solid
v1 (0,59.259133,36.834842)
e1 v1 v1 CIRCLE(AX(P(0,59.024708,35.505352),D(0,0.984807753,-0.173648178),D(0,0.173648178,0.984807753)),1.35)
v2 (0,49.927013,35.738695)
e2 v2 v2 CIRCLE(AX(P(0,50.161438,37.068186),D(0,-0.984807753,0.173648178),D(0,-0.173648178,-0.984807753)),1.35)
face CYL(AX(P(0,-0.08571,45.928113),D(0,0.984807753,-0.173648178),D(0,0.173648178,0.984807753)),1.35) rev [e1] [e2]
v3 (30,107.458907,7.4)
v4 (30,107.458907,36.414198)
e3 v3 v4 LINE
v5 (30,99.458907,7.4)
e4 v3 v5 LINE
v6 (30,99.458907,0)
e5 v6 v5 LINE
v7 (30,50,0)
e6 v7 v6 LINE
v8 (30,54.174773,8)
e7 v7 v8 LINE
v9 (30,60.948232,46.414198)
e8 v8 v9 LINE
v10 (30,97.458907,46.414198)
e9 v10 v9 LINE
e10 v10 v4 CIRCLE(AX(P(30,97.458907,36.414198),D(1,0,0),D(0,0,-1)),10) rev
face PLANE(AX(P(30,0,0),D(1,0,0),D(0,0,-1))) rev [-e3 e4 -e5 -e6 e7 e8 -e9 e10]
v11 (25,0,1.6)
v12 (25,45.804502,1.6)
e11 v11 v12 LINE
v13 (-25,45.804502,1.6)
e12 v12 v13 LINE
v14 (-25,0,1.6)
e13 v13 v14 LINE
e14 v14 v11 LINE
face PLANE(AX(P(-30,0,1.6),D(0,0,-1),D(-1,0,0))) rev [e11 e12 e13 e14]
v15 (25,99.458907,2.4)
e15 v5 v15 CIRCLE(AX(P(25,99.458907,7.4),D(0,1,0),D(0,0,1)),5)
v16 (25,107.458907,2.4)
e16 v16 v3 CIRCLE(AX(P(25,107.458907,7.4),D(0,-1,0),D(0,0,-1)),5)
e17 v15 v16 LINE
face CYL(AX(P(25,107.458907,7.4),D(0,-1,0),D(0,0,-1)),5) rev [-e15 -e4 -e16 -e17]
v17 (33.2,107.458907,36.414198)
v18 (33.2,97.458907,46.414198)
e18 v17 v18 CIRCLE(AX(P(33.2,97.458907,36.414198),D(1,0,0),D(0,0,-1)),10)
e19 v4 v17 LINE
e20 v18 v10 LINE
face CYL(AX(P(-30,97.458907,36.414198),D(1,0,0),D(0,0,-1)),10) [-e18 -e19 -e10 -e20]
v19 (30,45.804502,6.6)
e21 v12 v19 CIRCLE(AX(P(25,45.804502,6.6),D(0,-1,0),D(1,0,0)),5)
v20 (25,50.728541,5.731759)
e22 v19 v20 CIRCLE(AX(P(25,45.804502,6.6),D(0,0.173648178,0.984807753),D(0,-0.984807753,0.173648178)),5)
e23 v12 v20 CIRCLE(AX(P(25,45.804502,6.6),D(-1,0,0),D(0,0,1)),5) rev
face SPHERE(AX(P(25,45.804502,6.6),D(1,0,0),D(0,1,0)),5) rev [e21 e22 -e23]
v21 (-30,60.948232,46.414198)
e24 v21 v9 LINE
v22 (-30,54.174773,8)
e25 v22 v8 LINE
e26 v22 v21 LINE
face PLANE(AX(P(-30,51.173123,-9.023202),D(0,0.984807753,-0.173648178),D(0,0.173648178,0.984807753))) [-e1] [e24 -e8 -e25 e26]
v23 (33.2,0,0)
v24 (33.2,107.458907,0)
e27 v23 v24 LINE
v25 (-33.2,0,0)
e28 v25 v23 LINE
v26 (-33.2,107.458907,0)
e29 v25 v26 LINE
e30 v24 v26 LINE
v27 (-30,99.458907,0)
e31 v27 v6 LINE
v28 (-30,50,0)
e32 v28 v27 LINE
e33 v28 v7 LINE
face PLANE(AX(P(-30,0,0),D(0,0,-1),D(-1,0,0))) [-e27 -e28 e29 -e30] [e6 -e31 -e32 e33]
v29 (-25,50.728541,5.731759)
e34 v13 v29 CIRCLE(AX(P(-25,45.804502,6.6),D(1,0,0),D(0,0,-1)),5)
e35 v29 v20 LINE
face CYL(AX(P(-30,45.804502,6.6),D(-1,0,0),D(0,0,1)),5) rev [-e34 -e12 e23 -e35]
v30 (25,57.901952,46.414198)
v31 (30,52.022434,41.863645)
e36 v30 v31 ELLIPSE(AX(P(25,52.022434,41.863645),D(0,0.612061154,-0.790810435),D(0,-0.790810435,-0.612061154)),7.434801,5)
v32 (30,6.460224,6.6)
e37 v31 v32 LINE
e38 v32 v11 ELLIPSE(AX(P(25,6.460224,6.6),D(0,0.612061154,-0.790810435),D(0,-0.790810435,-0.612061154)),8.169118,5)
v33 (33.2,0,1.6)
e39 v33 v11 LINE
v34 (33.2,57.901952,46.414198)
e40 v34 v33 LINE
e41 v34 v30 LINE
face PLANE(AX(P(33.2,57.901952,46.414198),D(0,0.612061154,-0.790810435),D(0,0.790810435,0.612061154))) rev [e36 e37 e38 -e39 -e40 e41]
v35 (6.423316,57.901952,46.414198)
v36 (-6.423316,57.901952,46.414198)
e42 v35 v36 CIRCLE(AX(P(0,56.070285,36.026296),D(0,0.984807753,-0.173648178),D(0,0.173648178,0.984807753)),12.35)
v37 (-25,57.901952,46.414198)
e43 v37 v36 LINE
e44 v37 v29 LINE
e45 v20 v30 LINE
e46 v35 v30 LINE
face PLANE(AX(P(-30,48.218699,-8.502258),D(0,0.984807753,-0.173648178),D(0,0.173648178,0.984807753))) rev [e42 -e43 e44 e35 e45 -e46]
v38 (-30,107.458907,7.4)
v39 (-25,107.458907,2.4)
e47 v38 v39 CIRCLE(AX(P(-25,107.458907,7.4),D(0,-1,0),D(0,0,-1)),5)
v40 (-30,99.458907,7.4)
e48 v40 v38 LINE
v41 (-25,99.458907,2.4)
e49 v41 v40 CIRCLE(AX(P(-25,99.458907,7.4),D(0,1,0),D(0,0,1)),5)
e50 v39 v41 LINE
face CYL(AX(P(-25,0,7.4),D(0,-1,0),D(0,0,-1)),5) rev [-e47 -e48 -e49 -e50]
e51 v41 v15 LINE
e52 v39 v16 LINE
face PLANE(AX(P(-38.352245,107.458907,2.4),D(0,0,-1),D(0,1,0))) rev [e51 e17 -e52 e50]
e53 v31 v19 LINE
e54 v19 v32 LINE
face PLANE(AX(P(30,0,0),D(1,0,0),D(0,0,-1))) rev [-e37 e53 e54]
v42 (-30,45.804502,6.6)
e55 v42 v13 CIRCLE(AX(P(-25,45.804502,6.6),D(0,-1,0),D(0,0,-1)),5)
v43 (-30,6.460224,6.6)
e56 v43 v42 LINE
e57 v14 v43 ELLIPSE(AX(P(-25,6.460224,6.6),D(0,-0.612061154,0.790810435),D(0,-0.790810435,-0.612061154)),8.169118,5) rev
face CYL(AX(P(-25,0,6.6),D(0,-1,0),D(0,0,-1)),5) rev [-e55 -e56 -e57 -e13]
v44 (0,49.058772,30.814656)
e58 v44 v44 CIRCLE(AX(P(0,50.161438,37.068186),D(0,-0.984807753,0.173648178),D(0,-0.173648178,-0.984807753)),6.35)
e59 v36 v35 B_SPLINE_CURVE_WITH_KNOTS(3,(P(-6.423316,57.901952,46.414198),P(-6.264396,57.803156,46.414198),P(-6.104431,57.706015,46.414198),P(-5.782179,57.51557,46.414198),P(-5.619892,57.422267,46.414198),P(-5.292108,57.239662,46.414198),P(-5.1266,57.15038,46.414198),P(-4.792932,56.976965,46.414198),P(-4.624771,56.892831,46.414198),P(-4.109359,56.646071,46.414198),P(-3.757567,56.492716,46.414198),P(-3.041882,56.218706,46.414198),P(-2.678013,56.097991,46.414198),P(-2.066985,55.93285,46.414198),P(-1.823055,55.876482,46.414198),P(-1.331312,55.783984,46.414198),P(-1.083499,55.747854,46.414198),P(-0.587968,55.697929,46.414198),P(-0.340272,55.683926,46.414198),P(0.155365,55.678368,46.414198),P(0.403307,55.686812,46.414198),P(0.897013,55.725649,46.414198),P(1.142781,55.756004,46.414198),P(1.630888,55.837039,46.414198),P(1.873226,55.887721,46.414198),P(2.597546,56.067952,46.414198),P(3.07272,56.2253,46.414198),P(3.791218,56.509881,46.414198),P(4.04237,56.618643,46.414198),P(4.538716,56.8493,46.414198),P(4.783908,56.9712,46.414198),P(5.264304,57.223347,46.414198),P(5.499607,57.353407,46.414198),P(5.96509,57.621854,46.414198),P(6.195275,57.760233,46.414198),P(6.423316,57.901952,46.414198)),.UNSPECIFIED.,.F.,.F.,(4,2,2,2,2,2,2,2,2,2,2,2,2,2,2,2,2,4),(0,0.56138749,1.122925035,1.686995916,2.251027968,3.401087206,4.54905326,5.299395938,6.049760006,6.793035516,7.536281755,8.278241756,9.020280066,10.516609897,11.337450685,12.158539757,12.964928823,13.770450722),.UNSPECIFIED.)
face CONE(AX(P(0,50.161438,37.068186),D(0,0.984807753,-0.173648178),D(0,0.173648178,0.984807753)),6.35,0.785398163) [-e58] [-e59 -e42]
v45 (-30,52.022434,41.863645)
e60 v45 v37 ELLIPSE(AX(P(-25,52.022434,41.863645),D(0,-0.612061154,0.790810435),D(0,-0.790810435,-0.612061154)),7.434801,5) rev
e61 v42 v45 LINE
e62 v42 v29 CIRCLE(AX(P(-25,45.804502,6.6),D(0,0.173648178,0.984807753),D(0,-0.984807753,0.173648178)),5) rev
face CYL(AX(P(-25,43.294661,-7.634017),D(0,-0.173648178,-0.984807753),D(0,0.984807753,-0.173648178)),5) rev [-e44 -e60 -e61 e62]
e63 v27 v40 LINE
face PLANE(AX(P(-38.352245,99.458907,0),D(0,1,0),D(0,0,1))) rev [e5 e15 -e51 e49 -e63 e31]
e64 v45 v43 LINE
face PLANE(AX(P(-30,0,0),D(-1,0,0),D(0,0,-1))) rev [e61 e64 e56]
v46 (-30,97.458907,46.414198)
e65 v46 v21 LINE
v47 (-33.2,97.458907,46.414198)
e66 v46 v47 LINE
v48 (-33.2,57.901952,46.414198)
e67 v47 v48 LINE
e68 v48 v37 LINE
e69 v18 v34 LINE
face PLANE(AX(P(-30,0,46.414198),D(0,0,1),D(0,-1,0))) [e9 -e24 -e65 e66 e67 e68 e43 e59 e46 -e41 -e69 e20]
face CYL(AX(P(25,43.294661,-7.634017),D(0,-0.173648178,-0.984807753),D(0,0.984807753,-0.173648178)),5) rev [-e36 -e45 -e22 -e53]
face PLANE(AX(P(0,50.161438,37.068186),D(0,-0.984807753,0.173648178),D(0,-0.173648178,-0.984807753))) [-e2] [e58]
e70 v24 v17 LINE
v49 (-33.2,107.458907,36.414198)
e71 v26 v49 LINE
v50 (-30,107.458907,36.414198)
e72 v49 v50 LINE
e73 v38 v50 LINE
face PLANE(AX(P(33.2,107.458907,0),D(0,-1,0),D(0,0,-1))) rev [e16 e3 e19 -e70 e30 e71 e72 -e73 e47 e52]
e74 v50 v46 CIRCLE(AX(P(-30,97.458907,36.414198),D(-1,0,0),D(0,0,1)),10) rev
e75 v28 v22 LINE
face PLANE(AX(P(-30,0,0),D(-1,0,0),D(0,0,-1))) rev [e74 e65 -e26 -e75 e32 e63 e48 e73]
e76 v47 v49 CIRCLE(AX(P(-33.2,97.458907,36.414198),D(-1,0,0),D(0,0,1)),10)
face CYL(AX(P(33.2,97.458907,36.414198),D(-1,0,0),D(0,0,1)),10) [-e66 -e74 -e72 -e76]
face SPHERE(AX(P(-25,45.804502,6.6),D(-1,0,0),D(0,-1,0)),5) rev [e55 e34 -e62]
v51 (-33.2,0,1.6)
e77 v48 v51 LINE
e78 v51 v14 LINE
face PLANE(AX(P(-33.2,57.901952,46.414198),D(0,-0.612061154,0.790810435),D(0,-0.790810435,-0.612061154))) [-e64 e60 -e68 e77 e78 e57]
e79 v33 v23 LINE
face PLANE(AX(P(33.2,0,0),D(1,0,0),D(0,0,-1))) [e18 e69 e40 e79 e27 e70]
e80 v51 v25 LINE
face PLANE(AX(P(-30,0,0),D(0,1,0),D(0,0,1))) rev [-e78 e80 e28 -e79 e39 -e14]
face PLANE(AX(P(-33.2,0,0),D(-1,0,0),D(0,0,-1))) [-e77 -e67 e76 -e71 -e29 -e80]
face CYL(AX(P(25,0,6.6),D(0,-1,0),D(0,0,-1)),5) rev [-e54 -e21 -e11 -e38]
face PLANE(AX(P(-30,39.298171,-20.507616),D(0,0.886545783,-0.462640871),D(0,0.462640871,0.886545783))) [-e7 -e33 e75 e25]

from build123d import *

# Parameters (mm, degrees)
BOSS_EXTRUDE1_DEPTH      = 30
BOSS_EXTRUDE1_DEPTH_BACK = 30
BOSS_EXTRUDE2_DEPTH      = 3.2
SKETCH3_R                = 1.35
CUT_EXTRUDE1_DEPTH       = 86.695011246
SKETCH4_R                = 6.35
SKETCH4_R_2              = 1.35
BOSS_EXTRUDE3_DEPTH      = 6
CHAMFER1_SIZE            = 6
FILLET1_R                = 5
SKETCH5_W                = 2.4
SKETCH5_H                = 8
BOSS_EXTRUDE4_DEPTH      = 60
FILLET2_R                = 5
FILLET3_R                = 10


with BuildPart() as part:
    # Sketch1 → Boss-Extrude1 (new, two sides: drawn at the far end of the back side and taken through both)
    with BuildSketch(Plane(origin=(0, 0, 0), x_dir=(0, 0, -1), z_dir=(1, 0, 0)).offset(-BOSS_EXTRUDE1_DEPTH_BACK)):
        Polygon((-8, 54.174772512), (-46.414198462, 60.948232143), (-46.414198462, 57.901952308), (-1.6, 50), (-1.6, 0), (0, 0), (0, 50), align=None)
    extrude(amount=BOSS_EXTRUDE1_DEPTH + BOSS_EXTRUDE1_DEPTH_BACK)

    # Sketch2 → Boss-Extrude2 (add)
    with BuildSketch(Plane(origin=(30, 0, 0), x_dir=(0, 0, -1), z_dir=(1, 0, 0))):
        Polygon((0, 0), (0, 107.45890736), (-46.414198462, 107.45890736), (-46.414198462, 57.901952308), (-1.6, 0), align=None)
    boss_extrude2 = extrude(amount=BOSS_EXTRUDE2_DEPTH)

    # Mirror1: Boss-Extrude2 across plane
    add(boss_extrude2.mirror(Plane(origin=(0, 0, 0), x_dir=(0, 0, 1), z_dir=(1, 0, 0))))

    # Sketch3 → Cut-Extrude1 (cut, through all)
    with BuildSketch(Plane(origin=(0, 51.173122664, -9.023202213), x_dir=(1, 0, 0), z_dir=(0, 0.984807753012208, -0.17364817766693144))):
        with Locations(Location((0, -45.21547888, 0), (0, 0, 270))):
            Circle(SKETCH3_R)
    extrude(amount=-CUT_EXTRUDE1_DEPTH, mode=Mode.SUBTRACT)

    # Sketch4 → Boss-Extrude3 (add)
    with BuildSketch(Plane(origin=(0, 48.218699405, -8.50225768), x_dir=(1, 0, 0), z_dir=(0, -0.9848077530122079, 0.1736481776669319))):
        with Locations(Location((0, 45.21547888, 0), (0, 0, 90))):
            Circle(SKETCH4_R)
        with Locations(Location((0, 45.21547888, 0), (0, 0, 90))):
            Circle(SKETCH4_R_2, mode=Mode.SUBTRACT)
    extrude(amount=BOSS_EXTRUDE3_DEPTH)

    # Chamfer1
    # the kernel refuses this chamfer: 6 mm, written as the material it adds along each edge
    with BuildSketch(Plane(origin=(0, 56.070284915, 36.026296477), x_dir=(0, 0.1736481776669323, 0.9848077530122077), z_dir=(1, 0, 0))) as chamfer1_piece_1_section:
        Polygon((6.35 + CHAMFER1_SIZE, 0), (6.35, CHAMFER1_SIZE), (6.35, 0), align=None)
    chamfer1_piece_1 = revolve(axis=Axis((0, 56.070284915, 36.026296477), (0, -0.9848077530122079, 0.1736481776669319)), mode=Mode.PRIVATE)
    chamfer1_piece_1 = split(chamfer1_piece_1, bisect_by=Plane(origin=(0, 51.643480969, 46.414198462), z_dir=(0, 0, -1)), keep=Keep.TOP, mode=Mode.PRIVATE)
    chamfer1_piece_1 = split(chamfer1_piece_1, bisect_by=Plane(origin=(0, 48.535444939, 27.846718406), z_dir=(0, 0.9848077530122079, -0.1736481776669319)), keep=Keep.TOP, mode=Mode.PRIVATE)
    add(chamfer1_piece_1)

    # Fillet1
    fillet1_edges = [part.edges().sort_by_distance(p)[0] for p in [
        (0, 50, 1.6),
        (-30, 53.950976154, 24.007099231),
        (30, 53.950976154, 24.007099231),
        (-30, 25, 1.6),
        (30, 25, 1.6),
    ]]
    fillet(fillet1_edges, radius=FILLET1_R)

    # Sketch5 → Boss-Extrude4 (add)
    with BuildSketch(Plane.ZY.offset(-30)):
        with Locations((1.2, 103.45890736)):
            Rectangle(SKETCH5_W, SKETCH5_H)
    extrude(amount=BOSS_EXTRUDE4_DEPTH)

    # Fillet2
    fillet2_edges = [part.edges().sort_by_distance(p)[0] for p in [
        (30, 103.45890736, 2.4),
        (-30, 103.45890736, 2.4),
    ]]
    fillet(fillet2_edges, radius=FILLET2_R)

    # Fillet3
    fillet3_edges = [part.edges().sort_by_distance(p)[0] for p in [
        (31.6, 107.45890736, 46.414198462),
        (-31.6, 107.45890736, 46.414198462),
    ]]
    fillet(fillet3_edges, radius=FILLET3_R)


solid = part.part
